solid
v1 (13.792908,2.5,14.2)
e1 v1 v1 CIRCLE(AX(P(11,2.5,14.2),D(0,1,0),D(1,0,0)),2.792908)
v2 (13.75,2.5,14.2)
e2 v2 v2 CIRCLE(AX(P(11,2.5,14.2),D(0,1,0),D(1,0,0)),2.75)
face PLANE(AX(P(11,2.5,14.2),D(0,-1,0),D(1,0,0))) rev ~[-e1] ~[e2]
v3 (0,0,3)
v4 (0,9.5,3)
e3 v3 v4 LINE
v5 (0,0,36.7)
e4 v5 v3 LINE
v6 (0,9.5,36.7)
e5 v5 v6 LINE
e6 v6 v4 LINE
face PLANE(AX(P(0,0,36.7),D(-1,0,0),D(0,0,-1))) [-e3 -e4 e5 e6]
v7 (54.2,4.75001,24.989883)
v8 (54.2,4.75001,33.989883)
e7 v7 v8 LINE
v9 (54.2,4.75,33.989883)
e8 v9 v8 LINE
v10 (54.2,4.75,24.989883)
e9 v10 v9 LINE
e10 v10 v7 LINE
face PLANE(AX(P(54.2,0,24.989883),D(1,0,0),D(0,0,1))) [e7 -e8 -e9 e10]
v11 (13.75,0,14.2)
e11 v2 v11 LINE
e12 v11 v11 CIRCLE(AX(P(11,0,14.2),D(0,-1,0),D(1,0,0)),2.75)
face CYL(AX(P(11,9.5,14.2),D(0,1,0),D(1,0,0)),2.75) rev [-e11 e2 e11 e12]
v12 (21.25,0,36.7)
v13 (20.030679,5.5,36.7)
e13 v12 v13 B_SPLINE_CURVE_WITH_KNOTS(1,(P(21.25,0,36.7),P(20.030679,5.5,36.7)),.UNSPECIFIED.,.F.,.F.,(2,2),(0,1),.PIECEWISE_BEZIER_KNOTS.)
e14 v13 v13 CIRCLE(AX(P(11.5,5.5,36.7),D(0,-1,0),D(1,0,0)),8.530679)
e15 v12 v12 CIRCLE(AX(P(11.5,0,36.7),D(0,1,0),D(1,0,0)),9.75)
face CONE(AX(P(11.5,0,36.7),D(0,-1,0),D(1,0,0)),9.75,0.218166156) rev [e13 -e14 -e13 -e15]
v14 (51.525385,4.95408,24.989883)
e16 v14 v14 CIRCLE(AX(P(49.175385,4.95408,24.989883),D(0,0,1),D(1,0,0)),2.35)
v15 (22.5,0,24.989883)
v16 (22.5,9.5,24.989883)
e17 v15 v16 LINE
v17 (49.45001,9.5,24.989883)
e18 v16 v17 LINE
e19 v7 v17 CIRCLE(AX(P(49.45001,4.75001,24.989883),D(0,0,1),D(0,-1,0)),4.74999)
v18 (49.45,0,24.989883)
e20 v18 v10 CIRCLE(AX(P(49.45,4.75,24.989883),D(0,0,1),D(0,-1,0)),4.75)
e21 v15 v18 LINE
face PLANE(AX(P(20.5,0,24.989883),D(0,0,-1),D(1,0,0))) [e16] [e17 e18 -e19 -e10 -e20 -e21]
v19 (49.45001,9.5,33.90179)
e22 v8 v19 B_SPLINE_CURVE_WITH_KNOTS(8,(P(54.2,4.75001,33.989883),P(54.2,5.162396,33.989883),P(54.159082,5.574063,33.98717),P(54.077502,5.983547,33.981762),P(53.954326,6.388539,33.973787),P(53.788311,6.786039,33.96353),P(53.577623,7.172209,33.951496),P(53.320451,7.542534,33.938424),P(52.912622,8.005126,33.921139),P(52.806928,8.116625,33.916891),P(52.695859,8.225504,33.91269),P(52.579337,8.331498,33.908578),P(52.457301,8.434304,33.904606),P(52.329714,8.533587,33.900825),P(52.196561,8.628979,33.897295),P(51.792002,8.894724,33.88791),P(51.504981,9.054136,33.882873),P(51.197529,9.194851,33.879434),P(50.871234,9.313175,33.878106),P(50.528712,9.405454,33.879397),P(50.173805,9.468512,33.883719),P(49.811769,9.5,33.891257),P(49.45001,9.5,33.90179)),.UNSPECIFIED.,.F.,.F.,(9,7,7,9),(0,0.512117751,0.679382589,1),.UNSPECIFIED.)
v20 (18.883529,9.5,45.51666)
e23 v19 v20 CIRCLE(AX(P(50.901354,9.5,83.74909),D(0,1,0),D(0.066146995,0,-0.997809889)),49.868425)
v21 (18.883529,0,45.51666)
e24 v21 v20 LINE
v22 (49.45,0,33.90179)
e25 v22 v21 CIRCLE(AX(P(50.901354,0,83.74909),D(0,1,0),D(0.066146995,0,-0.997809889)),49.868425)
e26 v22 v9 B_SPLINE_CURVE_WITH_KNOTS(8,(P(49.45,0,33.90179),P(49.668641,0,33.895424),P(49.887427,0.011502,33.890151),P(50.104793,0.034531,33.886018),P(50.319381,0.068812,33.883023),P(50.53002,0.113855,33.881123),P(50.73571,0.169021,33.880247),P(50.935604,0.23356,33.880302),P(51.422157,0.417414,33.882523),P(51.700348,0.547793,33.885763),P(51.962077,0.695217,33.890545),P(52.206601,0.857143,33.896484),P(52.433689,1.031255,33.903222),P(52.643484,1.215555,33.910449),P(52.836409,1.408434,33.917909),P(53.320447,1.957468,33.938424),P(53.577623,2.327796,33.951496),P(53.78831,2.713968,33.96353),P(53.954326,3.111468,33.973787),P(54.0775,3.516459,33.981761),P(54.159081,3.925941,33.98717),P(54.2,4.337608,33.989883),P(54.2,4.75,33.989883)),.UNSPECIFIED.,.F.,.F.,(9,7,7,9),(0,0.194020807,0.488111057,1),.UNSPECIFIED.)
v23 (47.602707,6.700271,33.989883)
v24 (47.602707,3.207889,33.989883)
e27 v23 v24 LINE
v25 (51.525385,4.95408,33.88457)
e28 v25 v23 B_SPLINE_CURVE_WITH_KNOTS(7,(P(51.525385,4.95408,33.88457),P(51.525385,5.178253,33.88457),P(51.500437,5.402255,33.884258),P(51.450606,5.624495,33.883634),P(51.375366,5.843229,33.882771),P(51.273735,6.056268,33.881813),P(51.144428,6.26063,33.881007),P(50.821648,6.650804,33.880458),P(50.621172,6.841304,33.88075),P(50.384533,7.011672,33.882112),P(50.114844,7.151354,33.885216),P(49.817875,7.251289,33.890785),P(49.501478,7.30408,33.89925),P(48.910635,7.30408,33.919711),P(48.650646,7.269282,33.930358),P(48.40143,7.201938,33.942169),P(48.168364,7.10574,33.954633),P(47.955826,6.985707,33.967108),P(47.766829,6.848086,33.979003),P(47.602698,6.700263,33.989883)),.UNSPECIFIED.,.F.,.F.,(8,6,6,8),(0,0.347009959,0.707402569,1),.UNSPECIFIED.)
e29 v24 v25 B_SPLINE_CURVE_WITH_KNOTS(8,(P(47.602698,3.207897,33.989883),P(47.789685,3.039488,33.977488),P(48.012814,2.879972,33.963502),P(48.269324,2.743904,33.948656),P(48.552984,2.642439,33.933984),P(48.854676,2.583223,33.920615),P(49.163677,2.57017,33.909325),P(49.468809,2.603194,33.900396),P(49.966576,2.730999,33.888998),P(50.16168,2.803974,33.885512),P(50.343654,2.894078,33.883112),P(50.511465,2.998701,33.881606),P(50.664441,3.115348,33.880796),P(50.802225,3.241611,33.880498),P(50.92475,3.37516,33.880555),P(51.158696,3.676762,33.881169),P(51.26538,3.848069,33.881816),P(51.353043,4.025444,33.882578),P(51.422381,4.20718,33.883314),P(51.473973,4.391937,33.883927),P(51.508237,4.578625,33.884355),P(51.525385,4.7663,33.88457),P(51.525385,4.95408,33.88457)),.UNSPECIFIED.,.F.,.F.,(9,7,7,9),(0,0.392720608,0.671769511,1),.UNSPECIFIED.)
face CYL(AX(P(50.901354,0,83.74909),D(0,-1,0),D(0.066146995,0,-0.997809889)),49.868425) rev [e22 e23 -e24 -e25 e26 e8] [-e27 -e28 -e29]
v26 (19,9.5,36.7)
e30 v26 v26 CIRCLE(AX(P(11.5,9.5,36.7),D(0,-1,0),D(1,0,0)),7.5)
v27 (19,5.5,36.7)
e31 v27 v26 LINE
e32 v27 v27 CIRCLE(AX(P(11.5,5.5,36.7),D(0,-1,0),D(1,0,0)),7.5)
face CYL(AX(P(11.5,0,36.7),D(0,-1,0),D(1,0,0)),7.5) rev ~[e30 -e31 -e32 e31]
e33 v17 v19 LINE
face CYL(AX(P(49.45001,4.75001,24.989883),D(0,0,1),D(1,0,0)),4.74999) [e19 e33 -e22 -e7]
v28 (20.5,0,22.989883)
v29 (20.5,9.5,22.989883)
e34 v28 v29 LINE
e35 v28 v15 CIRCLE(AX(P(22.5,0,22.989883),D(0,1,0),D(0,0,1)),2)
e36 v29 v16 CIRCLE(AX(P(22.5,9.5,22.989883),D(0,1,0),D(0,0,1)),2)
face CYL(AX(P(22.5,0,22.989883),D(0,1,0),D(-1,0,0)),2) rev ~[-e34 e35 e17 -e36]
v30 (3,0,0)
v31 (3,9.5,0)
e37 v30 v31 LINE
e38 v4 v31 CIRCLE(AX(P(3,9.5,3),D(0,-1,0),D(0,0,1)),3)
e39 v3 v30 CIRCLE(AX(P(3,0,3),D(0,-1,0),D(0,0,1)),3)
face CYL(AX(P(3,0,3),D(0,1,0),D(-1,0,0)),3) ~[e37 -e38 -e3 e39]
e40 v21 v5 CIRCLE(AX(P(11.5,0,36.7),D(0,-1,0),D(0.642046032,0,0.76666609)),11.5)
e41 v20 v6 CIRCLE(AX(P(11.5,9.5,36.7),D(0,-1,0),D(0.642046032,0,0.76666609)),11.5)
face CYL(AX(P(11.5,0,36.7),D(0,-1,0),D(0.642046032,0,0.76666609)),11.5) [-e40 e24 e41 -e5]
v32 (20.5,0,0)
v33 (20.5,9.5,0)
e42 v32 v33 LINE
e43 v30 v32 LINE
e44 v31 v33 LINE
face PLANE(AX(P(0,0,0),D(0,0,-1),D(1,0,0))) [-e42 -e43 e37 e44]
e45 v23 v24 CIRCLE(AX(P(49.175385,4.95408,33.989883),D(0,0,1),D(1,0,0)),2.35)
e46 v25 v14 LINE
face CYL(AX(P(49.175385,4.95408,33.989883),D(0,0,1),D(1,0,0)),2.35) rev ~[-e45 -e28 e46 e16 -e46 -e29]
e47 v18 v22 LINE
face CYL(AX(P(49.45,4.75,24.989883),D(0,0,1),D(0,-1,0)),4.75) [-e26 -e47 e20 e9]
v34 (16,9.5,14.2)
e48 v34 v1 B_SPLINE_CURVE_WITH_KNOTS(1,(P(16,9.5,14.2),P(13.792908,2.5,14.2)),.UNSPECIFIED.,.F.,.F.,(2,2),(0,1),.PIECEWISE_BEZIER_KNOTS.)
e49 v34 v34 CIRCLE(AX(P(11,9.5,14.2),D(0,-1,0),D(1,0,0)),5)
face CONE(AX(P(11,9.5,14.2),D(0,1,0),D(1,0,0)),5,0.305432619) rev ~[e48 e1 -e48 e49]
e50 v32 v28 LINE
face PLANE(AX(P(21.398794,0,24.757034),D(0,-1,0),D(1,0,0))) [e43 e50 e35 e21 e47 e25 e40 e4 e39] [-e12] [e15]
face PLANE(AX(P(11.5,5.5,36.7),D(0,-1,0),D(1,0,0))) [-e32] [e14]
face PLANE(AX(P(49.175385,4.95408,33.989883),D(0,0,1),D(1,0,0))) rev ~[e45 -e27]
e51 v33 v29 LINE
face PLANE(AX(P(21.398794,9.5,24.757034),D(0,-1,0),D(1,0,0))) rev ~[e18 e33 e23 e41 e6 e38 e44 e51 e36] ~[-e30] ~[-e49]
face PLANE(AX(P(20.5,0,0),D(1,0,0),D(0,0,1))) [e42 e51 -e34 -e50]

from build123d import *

# Parameters (mm, degrees)
F1_DEPTH       = 9.5
F2_R           = 7.5
F3_DEPTH       = 9.5
F4_R           = 8.5
F5_DEPTH       = 5.5
F6_R           = 9.75
F7_DEPTH       = 5.5
F7_TAPER       = 12.5
F7_DEPTH_BACK  = 25
F8_R           = 4.75
F9_R           = 4.74999
F10_R          = 3
F11_R          = 2
F13_R          = 2.35
F14_DEPTH      = 10
F16_R          = 2.75
F17_DEPTH      = 9.5
F18_R          = 5
F19_DEPTH      = 7
F19_TAPER      = 17.5
F19_DEPTH_BACK = 7


# Not quite as in the source:
# - a fillet or chamfer is up to 0.001 mm smaller than in the source, because OpenCascade refuses the exact size


with BuildPart() as f1:
    # F0 (on Front) → F1 (new body)
    with BuildSketch(Plane.XZ):
        with BuildLine():
            Line((0, 36.7), (0, 0))
            Line((0, 0), (20.5, 0))
            Line((20.5, 0), (20.5, 24.9898828528))
            Line((20.5, 24.9898828528), (54.2, 24.9898828528))
            Line((54.2, 24.9898828528), (54.2, 33.9898828528))
            ThreePointArc((54.2, 33.9898828528), (35.4283305629, 36.3418613979), (18.8835293674, 45.5166600298))
            ThreePointArc((18.8835293674, 45.5166600298), (6.6348477786, 47.1201868439), (0, 36.7))
        make_face()
    extrude(amount=-F1_DEPTH)

    # F2 (on Front) → F3 (cut)
    with BuildSketch(Plane.XZ):
        with Locations((11.5, 36.7)):
            Circle(F2_R)
    extrude(amount=-F3_DEPTH, mode=Mode.SUBTRACT)

    # F4 (on Front) → F5 (cut)
    with BuildSketch(Plane.XZ):
        with Locations((11.5, 36.7)):
            Circle(F4_R)
    extrude(amount=-F5_DEPTH, mode=Mode.SUBTRACT)

    # F6 (on Front) → F7 (cut, two sides)
    with BuildSketch(Plane.XZ) as f7_sk:
        with Locations((11.5, 36.7)):
            Circle(F6_R)
    extrude(amount=-F7_DEPTH, taper=F7_TAPER, mode=Mode.SUBTRACT)
    extrude(f7_sk.sketch, amount=F7_DEPTH_BACK, mode=Mode.SUBTRACT)

    # F8
    f8_edges = [f1.edges().sort_by_distance(p)[0] for p in [
        (54.2, 0, 29.489883),
    ]]
    fillet(f8_edges, radius=F8_R)

    # F9 (radius 4.75 in the source; OpenCascade refuses exactly that, so slightly less here)
    f9_edges = [f1.edges().sort_by_distance(p)[0] for p in [
        (54.2, 9.5, 29.489883),
    ]]
    fillet(f9_edges, radius=F9_R)

    # F10
    f10_edges = [f1.edges().sort_by_distance(p)[0] for p in [
        (0, 4.75, 0),
    ]]
    fillet(f10_edges, radius=F10_R)

    # F11
    f11_edges = [f1.edges().sort_by_distance(p)[0] for p in [
        (20.5, 4.75, 24.989883),
    ]]
    fillet(f11_edges, radius=F11_R)

    # F13 (on face) → F14 (cut)
    with BuildSketch(Plane.XY.offset(33.9898828528)):
        with Locations((49.1753853858, 4.9540796317)):
            Circle(F13_R)
    extrude(amount=-F14_DEPTH, mode=Mode.SUBTRACT)

    # F16 (on offset) → F17 (cut)
    with BuildSketch(Plane.XZ.offset(-9.5)):
        with Locations((11, 14.2)):
            Circle(F16_R)
    extrude(amount=F17_DEPTH, mode=Mode.SUBTRACT)

    # F18 (on offset) → F19 (cut, two sides)
    with BuildSketch(Plane.XZ.offset(-9.5)) as f19_sk:
        with Locations((11, 14.2)):
            Circle(F18_R)
    extrude(amount=F19_DEPTH, taper=F19_TAPER, mode=Mode.SUBTRACT)
    extrude(f19_sk.sketch, amount=-F19_DEPTH_BACK, mode=Mode.SUBTRACT)


solid = f1.part
